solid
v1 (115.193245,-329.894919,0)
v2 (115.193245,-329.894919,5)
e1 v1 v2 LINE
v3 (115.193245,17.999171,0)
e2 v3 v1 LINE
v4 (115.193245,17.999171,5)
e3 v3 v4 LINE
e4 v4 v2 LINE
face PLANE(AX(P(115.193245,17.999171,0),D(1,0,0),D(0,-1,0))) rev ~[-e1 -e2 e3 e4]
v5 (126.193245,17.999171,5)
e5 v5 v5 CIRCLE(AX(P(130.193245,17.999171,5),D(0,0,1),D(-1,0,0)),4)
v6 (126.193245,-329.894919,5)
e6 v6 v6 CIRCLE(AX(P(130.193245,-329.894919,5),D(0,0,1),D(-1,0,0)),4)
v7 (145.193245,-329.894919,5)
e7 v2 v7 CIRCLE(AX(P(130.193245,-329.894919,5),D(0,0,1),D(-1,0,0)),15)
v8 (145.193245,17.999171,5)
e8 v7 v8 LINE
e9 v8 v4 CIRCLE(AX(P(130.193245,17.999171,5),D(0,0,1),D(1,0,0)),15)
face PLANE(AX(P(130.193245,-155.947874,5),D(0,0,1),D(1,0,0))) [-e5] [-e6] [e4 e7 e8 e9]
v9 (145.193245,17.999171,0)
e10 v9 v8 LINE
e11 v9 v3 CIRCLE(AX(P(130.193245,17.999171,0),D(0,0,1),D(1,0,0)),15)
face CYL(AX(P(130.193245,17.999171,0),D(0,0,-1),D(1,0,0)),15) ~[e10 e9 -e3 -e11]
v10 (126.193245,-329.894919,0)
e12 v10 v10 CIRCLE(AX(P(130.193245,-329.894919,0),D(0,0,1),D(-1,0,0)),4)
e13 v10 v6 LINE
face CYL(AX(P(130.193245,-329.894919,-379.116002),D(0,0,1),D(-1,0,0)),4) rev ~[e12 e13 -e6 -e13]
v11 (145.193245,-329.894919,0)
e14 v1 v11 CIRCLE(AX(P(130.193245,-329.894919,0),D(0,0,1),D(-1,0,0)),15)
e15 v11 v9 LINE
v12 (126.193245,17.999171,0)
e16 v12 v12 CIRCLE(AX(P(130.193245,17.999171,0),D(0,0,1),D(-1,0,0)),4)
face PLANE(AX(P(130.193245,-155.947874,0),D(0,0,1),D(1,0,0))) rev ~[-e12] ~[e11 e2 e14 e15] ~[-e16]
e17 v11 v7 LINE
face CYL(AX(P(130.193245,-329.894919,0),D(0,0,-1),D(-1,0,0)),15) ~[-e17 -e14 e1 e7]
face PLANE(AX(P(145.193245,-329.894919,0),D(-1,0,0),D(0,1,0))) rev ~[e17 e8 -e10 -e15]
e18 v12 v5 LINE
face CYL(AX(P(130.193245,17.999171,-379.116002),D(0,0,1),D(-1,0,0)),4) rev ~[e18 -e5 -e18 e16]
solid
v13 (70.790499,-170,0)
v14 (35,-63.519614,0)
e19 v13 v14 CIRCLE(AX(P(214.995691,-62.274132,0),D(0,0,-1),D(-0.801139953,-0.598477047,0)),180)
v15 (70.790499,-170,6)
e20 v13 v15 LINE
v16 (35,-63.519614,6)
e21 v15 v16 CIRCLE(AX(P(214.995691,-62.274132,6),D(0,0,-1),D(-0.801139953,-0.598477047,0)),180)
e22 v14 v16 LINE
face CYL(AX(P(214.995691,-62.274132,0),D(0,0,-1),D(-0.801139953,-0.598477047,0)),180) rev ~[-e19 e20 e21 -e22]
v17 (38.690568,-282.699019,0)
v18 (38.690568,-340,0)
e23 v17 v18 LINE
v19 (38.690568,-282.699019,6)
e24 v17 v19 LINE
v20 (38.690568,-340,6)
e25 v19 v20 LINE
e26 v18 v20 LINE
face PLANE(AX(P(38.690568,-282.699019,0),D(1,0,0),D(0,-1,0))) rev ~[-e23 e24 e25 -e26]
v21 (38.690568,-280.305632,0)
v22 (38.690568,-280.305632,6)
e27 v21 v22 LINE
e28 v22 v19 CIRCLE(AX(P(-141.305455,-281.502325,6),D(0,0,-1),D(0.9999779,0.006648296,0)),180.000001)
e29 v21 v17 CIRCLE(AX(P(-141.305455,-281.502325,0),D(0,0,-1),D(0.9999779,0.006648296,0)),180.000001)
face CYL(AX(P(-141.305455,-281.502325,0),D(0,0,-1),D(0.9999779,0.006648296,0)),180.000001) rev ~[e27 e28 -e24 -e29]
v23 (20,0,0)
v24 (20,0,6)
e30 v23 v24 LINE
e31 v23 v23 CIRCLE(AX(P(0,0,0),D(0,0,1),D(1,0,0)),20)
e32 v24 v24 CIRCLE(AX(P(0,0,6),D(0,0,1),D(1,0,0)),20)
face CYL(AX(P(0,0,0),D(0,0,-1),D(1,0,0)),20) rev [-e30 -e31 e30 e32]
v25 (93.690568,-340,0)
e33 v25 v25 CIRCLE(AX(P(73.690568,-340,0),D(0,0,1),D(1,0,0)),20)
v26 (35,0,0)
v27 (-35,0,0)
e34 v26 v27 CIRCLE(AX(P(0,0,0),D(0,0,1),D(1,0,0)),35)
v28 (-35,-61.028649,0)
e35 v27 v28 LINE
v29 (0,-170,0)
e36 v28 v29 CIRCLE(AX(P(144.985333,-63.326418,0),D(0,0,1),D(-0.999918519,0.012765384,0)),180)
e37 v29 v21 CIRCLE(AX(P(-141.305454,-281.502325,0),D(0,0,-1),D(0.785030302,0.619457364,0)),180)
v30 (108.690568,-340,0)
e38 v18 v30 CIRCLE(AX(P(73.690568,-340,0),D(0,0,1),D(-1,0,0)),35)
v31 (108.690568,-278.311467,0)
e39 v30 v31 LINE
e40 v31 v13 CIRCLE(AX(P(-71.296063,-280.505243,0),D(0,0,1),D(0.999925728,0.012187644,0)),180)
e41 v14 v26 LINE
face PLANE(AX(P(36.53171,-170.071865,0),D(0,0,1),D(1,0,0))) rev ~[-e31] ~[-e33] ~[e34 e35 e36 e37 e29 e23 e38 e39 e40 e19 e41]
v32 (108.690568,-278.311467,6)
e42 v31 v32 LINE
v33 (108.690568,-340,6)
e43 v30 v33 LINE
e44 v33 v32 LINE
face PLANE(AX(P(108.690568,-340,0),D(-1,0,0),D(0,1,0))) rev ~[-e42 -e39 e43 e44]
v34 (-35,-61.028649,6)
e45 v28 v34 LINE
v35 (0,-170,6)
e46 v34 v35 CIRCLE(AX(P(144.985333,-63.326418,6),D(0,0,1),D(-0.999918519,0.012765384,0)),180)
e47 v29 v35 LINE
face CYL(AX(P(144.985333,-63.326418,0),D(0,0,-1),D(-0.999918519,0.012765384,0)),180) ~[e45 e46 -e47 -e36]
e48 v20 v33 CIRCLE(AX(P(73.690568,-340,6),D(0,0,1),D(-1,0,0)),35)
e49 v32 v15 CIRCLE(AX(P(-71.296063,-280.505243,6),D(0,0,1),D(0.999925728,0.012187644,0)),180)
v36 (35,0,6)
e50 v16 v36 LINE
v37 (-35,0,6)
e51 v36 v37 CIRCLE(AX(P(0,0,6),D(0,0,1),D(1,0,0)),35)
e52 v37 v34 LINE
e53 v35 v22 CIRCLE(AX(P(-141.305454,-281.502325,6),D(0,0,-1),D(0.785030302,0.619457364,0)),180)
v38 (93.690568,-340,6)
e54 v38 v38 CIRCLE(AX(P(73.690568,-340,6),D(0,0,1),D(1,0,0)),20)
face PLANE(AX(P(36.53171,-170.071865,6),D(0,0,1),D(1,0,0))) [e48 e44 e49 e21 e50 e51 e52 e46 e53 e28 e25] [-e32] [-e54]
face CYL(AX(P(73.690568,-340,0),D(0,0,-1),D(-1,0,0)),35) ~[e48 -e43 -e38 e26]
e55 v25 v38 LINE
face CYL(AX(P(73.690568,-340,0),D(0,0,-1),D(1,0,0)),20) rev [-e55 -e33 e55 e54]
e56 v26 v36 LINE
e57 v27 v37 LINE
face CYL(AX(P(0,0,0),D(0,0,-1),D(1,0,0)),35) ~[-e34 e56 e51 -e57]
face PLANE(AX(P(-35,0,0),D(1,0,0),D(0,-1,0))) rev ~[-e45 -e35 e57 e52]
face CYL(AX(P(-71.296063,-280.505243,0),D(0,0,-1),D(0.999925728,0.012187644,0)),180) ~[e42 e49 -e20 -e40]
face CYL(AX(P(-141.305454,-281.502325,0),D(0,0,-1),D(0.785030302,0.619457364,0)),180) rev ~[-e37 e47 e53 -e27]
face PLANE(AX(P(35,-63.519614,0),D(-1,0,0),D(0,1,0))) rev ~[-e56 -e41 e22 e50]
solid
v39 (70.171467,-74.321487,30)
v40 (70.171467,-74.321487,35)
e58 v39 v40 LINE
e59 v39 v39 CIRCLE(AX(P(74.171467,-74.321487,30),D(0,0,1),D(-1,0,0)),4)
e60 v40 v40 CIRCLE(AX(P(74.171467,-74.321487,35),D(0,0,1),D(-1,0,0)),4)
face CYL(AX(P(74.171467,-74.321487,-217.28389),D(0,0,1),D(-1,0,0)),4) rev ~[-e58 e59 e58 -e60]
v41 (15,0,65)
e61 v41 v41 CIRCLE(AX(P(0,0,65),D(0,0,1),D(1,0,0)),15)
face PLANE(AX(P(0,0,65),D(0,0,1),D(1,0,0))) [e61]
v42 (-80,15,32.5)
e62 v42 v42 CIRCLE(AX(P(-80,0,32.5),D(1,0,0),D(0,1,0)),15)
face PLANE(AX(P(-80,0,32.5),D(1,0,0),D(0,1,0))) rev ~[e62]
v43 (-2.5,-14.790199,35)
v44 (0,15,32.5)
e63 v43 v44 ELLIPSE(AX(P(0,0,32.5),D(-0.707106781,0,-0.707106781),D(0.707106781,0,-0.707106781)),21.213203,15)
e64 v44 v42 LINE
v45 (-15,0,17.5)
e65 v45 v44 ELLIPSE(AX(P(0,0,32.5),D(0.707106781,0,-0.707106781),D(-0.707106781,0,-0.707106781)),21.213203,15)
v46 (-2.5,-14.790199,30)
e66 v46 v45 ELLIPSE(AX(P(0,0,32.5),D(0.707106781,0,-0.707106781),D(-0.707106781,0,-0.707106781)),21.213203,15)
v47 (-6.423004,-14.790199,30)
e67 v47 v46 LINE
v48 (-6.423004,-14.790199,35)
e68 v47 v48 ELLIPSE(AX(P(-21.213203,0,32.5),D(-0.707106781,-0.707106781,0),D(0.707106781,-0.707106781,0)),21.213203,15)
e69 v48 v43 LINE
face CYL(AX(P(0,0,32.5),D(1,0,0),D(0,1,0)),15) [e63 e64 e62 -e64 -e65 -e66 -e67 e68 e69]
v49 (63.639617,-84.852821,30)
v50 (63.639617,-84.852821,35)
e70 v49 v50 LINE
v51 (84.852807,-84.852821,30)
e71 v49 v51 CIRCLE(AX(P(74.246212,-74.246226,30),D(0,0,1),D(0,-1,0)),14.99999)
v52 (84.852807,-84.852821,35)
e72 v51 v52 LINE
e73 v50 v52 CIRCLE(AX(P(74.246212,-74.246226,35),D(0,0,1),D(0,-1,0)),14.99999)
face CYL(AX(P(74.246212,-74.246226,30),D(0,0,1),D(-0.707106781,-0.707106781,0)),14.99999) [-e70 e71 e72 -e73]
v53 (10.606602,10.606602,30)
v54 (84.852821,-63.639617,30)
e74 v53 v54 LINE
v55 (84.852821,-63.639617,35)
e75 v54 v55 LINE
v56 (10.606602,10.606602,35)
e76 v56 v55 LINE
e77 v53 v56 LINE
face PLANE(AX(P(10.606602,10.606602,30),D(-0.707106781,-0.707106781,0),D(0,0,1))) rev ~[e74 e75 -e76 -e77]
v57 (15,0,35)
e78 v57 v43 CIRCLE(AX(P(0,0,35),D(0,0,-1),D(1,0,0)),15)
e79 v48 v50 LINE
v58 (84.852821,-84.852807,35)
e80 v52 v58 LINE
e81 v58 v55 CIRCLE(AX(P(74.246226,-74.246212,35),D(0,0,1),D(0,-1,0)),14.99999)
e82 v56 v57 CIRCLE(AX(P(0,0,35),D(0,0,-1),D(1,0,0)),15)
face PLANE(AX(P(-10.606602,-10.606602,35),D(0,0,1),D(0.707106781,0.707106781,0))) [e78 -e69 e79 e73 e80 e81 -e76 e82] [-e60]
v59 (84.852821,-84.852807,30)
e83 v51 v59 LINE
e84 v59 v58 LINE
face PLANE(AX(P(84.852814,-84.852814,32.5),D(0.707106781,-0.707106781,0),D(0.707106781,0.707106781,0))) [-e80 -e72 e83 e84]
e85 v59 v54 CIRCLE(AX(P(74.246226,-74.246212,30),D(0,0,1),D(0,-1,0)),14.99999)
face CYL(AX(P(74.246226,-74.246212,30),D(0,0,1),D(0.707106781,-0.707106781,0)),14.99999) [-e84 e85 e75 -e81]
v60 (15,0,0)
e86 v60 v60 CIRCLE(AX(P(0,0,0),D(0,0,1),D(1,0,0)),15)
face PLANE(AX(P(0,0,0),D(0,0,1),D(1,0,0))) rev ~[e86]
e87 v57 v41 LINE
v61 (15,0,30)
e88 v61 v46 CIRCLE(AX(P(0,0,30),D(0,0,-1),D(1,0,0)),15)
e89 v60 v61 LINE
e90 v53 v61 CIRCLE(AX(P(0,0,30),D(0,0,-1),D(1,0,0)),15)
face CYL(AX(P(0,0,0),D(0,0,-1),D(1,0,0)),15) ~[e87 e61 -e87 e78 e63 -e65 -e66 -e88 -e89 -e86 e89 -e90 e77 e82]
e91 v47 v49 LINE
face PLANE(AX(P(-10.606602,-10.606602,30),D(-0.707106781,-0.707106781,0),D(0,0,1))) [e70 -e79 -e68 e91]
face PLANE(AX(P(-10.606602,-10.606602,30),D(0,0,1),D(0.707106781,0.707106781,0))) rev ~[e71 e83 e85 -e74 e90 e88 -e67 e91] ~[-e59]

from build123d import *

# Parameters (mm, degrees)
F0_R      = 20
F1_DEPTH  = 6
F2_R      = 15
F3_DEPTH  = 65
F4_R      = 15
F5_DEPTH  = 80
F7_W      = 30
F7_H      = 5
F8_DEPTH  = 120
F10_D     = 8
F11_R     = 14.99999
F13_DEPTH = 5
F14_D     = 8


# Not quite as in the source:
# - a fillet or chamfer is up to 0.001 mm smaller than in the source, because OpenCascade refuses the exact size


with BuildPart() as f1:
    # F0 (on Top) → F1 (new body)
    with BuildSketch(Plane.XY):
        with BuildLine():
            Line((-35, 0), (-35, -61.0286490145))
            ThreePointArc((-35, -61.0286490145), (-26.3919474837, -118.3702876491), (0, -170))
            ThreePointArc((0, -170), (28.5488738406, -221.9245845611), (38.6905676698, -280.3056322195))
            ThreePointArc((38.6905676698, -280.3056322195), (38.6945456991, -281.5023254682), (38.6905676698, -282.6990187168))
            Line((38.6905676698, -282.6990187168), (38.6905676698, -340))
            ThreePointArc((38.6905676698, -340), (73.6905676698, -375), (108.6905676698, -340))
            Line((108.6905676698, -340), (108.6905676698, -282.6990187168))
            Line((108.6905676698, -282.6990187168), (108.6905676698, -278.31146671))
            ThreePointArc((108.6905676698, -278.31146671), (98.6028154032, -221.0546666233), (70.7904994631, -170))
            ThreePointArc((70.7904994631, -170), (44.3760227078, -119.6233145812), (35, -63.5196140416))
            Line((35, -63.5196140416), (35, 0))
            ThreePointArc((35, 0), (0, 35), (-35, 0))
        make_face()
        with Locations((73.6905676698, -340)):
            Circle(F0_R, mode=Mode.SUBTRACT)
        Circle(F0_R, mode=Mode.SUBTRACT)
    extrude(amount=F1_DEPTH)


with BuildPart() as f3:
    # F2 (on Top) → F3 (new body)
    with BuildSketch(Plane.XY):
        Circle(F2_R)
    extrude(amount=F3_DEPTH)

    # F4 (on Right) → F5 (join)
    with BuildSketch(Plane.YZ):
        with Locations((0, 32.5)):
            Circle(F4_R)
    extrude(amount=-F5_DEPTH)

    # F7 (on face) → F8 (join)
    with BuildSketch(Plane(origin=(0, 0, 0), x_dir=(0.7071067812, 0.7071067812, 0), z_dir=(0.7071067812, -0.7071067812, 0))):
        with Locations((0, 32.5)):
            Rectangle(F7_W, F7_H)
    extrude(amount=F8_DEPTH)

    # F10 (through all)
    with Locations(Plane(origin=(0, 0, 0), x_dir=(1, 0, 0), z_dir=(0, 0, -1))):
        with Locations((74.1714673688, 74.321487157)):
            Hole(F10_D / 2)

    # F11 (radius 15 in the source; OpenCascade refuses exactly that, so slightly less here)
    f11_edges = [f3.edges().sort_by_distance(p)[0] for p in [
        (95.459415, -74.246212, 32.5),
        (74.246212, -95.459415, 32.5),
    ]]
    fillet(f11_edges, radius=F11_R)


with BuildPart() as f13:
    # F12 (on Top) → F13 (new body)
    with BuildSketch(Plane.XY):
        with BuildLine():
            ThreePointArc((130.1932446659, 32.9991710233), (119.5866429481, 28.6057727411), (115.1932446659, 17.9991710233))
            Line((115.1932446659, 17.9991710233), (115.1932446659, -329.8949189767))
            ThreePointArc((115.1932446659, -329.8949189767), (119.5866429481, -340.5015206945), (130.1932446659, -344.8949189767))
            ThreePointArc((130.1932446659, -344.8949189767), (140.7998463837, -340.5015206945), (145.1932446659, -329.8949189767))
            Line((145.1932446659, -329.8949189767), (145.1932446659, 17.9991710233))
            ThreePointArc((145.1932446659, 17.9991710233), (140.7998463837, 28.6057727411), (130.1932446659, 32.9991710233))
        make_face()
    extrude(amount=F13_DEPTH)

    # F14 (through all)
    with Locations(Plane(origin=(0, 0, 0), x_dir=(1, 0, 0), z_dir=(0, 0, -1))):
        with Locations((130.1932446659, 329.8949189767), (130.1932446659, -17.9991710233)):
            Hole(F14_D / 2)


solid = Compound([f1.part, f3.part, f13.part])
